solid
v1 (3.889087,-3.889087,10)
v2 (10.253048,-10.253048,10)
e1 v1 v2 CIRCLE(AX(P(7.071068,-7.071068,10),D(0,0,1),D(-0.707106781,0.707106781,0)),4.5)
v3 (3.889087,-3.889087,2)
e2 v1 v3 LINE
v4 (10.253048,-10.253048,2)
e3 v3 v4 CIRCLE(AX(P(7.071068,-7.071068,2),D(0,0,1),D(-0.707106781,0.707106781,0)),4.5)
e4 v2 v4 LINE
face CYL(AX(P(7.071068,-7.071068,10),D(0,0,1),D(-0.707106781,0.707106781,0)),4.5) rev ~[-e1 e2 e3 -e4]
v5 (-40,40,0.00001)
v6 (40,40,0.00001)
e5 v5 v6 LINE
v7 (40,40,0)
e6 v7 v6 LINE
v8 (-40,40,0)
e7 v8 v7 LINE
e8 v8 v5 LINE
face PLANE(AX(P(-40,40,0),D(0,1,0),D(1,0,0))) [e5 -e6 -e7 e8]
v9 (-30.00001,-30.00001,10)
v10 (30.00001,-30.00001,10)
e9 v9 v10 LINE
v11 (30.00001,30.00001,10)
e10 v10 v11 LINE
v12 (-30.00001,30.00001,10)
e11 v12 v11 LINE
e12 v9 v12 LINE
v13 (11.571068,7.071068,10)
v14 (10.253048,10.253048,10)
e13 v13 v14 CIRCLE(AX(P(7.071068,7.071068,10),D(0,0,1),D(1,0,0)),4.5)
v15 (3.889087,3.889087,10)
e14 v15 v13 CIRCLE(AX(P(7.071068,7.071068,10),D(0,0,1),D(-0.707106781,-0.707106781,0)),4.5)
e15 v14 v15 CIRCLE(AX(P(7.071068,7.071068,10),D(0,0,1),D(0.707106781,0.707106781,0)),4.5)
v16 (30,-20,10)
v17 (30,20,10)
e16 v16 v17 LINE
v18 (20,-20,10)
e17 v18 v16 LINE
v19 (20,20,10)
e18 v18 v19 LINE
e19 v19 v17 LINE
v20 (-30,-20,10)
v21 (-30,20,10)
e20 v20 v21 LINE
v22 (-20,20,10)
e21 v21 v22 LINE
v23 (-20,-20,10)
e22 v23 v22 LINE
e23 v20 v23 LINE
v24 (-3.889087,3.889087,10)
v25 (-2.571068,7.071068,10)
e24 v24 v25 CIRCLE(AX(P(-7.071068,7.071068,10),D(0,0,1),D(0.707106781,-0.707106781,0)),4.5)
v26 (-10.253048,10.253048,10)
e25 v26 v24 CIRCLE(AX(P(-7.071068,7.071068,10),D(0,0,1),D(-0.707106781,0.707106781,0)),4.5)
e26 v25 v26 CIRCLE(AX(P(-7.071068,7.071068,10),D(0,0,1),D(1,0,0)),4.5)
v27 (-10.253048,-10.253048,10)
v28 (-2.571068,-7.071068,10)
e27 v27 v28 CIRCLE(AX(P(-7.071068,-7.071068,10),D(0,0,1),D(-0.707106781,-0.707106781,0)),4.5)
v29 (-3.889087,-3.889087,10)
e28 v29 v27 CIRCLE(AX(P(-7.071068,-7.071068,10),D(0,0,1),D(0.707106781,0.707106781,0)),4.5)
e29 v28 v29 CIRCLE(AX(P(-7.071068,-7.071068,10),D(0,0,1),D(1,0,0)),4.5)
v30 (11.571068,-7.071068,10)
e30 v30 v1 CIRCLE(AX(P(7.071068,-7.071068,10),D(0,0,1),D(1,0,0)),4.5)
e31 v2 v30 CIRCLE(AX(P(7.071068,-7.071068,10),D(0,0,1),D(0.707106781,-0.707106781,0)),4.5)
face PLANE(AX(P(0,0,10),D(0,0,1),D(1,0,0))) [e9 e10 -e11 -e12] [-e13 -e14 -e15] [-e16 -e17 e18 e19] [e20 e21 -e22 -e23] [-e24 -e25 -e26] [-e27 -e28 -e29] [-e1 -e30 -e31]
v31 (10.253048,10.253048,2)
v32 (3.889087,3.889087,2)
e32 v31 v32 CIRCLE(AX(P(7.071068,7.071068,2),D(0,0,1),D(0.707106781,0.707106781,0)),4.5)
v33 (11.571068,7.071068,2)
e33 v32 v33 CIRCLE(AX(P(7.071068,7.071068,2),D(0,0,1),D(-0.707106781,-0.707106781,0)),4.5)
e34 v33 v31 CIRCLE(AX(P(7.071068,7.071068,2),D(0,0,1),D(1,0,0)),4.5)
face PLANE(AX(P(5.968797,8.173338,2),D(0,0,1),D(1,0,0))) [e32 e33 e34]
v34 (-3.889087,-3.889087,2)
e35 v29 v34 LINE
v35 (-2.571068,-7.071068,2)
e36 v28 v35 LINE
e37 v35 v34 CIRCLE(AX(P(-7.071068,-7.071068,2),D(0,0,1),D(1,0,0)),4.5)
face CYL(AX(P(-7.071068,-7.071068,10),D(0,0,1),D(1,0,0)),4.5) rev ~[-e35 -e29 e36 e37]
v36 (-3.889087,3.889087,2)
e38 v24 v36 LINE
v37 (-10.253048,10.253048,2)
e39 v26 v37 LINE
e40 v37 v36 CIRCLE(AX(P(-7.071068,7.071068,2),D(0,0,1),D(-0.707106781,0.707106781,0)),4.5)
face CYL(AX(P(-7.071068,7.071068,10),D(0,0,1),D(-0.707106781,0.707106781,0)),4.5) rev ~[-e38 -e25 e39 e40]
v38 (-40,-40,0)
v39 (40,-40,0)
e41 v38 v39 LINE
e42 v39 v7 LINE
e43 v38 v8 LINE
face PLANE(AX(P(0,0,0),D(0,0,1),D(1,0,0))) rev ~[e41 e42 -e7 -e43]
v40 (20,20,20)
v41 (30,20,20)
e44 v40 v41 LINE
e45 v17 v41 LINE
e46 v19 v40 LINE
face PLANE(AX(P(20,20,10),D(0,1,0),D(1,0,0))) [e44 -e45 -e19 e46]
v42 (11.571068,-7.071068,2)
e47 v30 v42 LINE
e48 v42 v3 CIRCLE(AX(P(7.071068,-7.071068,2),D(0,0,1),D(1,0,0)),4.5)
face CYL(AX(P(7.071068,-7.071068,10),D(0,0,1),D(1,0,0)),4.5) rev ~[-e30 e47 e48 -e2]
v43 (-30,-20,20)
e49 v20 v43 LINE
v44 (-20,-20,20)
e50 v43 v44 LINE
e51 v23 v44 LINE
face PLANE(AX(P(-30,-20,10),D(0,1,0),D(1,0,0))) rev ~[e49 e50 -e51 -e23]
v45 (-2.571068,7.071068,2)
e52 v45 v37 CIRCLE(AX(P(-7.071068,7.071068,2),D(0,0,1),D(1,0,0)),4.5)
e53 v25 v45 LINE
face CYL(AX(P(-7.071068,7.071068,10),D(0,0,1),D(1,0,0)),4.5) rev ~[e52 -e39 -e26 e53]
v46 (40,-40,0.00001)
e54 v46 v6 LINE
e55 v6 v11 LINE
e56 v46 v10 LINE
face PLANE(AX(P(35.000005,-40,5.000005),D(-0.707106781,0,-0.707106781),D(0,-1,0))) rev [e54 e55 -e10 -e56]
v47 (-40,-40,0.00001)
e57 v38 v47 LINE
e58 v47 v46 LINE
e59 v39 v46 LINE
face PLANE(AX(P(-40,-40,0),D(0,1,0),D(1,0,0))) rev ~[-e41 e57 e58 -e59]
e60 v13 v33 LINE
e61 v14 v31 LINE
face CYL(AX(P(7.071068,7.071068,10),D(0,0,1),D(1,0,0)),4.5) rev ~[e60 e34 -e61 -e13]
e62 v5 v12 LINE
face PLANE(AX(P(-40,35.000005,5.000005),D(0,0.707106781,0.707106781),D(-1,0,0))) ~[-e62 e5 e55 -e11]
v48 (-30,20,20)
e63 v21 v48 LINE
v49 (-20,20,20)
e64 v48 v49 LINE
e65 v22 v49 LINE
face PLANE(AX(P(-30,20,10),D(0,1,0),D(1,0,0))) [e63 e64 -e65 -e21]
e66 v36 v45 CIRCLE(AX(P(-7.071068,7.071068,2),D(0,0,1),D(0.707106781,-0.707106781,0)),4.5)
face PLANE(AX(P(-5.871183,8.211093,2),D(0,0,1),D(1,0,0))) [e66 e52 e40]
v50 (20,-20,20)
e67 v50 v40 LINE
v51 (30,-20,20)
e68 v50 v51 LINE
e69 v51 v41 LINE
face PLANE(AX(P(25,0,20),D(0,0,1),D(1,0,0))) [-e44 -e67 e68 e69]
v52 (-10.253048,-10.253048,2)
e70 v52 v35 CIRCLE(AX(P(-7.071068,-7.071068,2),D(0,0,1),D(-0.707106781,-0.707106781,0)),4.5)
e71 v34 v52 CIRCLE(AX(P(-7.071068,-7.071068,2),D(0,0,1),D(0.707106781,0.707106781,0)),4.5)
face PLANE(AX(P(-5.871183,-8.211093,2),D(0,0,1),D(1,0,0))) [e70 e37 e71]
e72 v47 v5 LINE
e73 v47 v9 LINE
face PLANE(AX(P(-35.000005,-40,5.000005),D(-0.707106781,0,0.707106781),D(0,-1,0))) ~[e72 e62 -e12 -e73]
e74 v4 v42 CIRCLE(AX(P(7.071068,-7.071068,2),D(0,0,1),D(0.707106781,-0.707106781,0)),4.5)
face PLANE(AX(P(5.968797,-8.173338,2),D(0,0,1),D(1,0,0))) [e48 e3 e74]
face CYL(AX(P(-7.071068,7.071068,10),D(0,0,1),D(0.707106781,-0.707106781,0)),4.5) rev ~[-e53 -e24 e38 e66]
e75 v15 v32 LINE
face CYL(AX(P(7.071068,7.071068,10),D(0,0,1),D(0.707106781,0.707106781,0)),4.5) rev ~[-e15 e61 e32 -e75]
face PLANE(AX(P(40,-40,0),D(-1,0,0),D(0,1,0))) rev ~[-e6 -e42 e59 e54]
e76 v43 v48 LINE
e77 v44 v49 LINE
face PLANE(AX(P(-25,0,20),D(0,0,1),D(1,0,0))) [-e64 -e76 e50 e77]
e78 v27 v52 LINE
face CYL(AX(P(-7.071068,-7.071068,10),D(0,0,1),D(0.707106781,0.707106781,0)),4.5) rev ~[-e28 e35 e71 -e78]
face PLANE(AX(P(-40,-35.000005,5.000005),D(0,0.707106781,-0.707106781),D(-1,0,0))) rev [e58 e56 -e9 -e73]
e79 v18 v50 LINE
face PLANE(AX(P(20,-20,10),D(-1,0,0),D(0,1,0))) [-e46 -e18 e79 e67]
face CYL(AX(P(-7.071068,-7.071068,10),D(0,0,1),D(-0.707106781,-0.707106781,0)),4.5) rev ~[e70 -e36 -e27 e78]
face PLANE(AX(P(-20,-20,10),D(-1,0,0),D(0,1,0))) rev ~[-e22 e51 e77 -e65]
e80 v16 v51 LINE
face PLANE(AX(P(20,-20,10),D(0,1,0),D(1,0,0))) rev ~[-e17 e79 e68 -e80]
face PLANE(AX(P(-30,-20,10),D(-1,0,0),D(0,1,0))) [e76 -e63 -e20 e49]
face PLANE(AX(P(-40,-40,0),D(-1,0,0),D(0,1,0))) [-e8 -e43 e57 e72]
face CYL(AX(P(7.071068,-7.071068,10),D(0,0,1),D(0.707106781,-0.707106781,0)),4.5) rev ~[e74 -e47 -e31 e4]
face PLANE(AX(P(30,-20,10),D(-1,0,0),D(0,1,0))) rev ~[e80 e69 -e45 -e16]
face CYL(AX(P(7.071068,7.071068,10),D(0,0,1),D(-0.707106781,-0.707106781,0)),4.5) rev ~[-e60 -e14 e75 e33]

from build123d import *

# Parameters (mm, degrees)
F0_W     = 80
F0_H     = 80
F1_DEPTH = 10
F2_SIZE2 = 9.99999
F2_SIZE  = 9.99999
F3_W     = 10
F3_H     = 40
F4_DEPTH = 10
F6_DEPTH = 8


# Not quite as in the source:
# - a fillet or chamfer is up to 0.001 mm smaller than in the source, because OpenCascade refuses the exact size


with BuildPart() as f1:
    # F0 (on Top) → F1 (new body)
    with BuildSketch(Plane.XY):
        Rectangle(F0_W, F0_H)
    extrude(amount=F1_DEPTH)

    # F2 (size 10 and 10 in the source; OpenCascade refuses exactly that, so slightly less here)
    f2_edges = [f1.edges().sort_by_distance(p)[0] for p in [
        (0, 40, 10),
        (-40, 0, 10),
        (0, -40, 10),
        (40, 0, 10),
    ]]
    chamfer(f2_edges, length=F2_SIZE, length2=F2_SIZE2)

    # F3 (on face) → F4 (join)
    with BuildSketch(Plane.XY.offset(10)):
        with Locations((25, 0)):
            Rectangle(F3_W, F3_H)
        with Locations((-25, 0)):
            Rectangle(F3_W, F3_H)
    extrude(amount=F4_DEPTH)

    # F5 (on face) → F6 (cut)
    with BuildSketch(Plane.XY.offset(10)):
        with BuildLine():
            Line((-3.8890872965, -3.8890872965), (-10.2530483272, -10.2530483272))
            ThreePointArc((-10.2530483272, -10.2530483272), (-5.3489923662, -11.2285257082), (-2.5710678119, -7.0710678119))
            ThreePointArc((-2.5710678119, -7.0710678119), (-2.9136099156, -5.3489923662), (-3.8890872965, -3.8890872965))
        make_face()
        with BuildLine():
            Line((3.8890872965, 3.8890872965), (10.2530483272, 10.2530483272))
            ThreePointArc((10.2530483272, 10.2530483272), (3.8890872965, 10.2530483272), (3.8890872965, 3.8890872965))
        make_face()
        with BuildLine():
            ThreePointArc((-2.5710678119, 7.0710678119), (-5.3489923662, 11.2285257082), (-10.2530483272, 10.2530483272))
            Line((-10.2530483272, 10.2530483272), (-3.8890872965, 3.8890872965))
            ThreePointArc((-3.8890872965, 3.8890872965), (-2.9136099156, 5.3489923662), (-2.5710678119, 7.0710678119))
        make_face()
        with BuildLine():
            ThreePointArc((11.5710678119, 7.0710678119), (11.2285257082, 8.7931432575), (10.2530483272, 10.2530483272))
            Line((10.2530483272, 10.2530483272), (3.8890872965, 3.8890872965))
            ThreePointArc((3.8890872965, 3.8890872965), (8.7931432575, 2.9136099156), (11.5710678119, 7.0710678119))
        make_face()
        with BuildLine():
            ThreePointArc((3.8890872965, -3.8890872965), (3.8890872965, -10.2530483272), (10.2530483272, -10.2530483272))
            Line((10.2530483272, -10.2530483272), (3.8890872965, -3.8890872965))
        make_face()
        with BuildLine():
            Line((-3.8890872965, 3.8890872965), (-10.2530483272, 10.2530483272))
            ThreePointArc((-10.2530483272, 10.2530483272), (-10.2530483272, 3.8890872965), (-3.8890872965, 3.8890872965))
        make_face()
        with BuildLine():
            ThreePointArc((-3.8890872965, -3.8890872965), (-10.2530483272, -3.8890872965), (-10.2530483272, -10.2530483272))
            Line((-10.2530483272, -10.2530483272), (-3.8890872965, -3.8890872965))
        make_face()
        with BuildLine():
            Line((3.8890872965, -3.8890872965), (10.2530483272, -10.2530483272))
            ThreePointArc((10.2530483272, -10.2530483272), (11.2285257082, -8.7931432575), (11.5710678119, -7.0710678119))
            ThreePointArc((11.5710678119, -7.0710678119), (8.7931432575, -2.9136099156), (3.8890872965, -3.8890872965))
        make_face()
    extrude(amount=-F6_DEPTH, mode=Mode.SUBTRACT)


solid = f1.part
